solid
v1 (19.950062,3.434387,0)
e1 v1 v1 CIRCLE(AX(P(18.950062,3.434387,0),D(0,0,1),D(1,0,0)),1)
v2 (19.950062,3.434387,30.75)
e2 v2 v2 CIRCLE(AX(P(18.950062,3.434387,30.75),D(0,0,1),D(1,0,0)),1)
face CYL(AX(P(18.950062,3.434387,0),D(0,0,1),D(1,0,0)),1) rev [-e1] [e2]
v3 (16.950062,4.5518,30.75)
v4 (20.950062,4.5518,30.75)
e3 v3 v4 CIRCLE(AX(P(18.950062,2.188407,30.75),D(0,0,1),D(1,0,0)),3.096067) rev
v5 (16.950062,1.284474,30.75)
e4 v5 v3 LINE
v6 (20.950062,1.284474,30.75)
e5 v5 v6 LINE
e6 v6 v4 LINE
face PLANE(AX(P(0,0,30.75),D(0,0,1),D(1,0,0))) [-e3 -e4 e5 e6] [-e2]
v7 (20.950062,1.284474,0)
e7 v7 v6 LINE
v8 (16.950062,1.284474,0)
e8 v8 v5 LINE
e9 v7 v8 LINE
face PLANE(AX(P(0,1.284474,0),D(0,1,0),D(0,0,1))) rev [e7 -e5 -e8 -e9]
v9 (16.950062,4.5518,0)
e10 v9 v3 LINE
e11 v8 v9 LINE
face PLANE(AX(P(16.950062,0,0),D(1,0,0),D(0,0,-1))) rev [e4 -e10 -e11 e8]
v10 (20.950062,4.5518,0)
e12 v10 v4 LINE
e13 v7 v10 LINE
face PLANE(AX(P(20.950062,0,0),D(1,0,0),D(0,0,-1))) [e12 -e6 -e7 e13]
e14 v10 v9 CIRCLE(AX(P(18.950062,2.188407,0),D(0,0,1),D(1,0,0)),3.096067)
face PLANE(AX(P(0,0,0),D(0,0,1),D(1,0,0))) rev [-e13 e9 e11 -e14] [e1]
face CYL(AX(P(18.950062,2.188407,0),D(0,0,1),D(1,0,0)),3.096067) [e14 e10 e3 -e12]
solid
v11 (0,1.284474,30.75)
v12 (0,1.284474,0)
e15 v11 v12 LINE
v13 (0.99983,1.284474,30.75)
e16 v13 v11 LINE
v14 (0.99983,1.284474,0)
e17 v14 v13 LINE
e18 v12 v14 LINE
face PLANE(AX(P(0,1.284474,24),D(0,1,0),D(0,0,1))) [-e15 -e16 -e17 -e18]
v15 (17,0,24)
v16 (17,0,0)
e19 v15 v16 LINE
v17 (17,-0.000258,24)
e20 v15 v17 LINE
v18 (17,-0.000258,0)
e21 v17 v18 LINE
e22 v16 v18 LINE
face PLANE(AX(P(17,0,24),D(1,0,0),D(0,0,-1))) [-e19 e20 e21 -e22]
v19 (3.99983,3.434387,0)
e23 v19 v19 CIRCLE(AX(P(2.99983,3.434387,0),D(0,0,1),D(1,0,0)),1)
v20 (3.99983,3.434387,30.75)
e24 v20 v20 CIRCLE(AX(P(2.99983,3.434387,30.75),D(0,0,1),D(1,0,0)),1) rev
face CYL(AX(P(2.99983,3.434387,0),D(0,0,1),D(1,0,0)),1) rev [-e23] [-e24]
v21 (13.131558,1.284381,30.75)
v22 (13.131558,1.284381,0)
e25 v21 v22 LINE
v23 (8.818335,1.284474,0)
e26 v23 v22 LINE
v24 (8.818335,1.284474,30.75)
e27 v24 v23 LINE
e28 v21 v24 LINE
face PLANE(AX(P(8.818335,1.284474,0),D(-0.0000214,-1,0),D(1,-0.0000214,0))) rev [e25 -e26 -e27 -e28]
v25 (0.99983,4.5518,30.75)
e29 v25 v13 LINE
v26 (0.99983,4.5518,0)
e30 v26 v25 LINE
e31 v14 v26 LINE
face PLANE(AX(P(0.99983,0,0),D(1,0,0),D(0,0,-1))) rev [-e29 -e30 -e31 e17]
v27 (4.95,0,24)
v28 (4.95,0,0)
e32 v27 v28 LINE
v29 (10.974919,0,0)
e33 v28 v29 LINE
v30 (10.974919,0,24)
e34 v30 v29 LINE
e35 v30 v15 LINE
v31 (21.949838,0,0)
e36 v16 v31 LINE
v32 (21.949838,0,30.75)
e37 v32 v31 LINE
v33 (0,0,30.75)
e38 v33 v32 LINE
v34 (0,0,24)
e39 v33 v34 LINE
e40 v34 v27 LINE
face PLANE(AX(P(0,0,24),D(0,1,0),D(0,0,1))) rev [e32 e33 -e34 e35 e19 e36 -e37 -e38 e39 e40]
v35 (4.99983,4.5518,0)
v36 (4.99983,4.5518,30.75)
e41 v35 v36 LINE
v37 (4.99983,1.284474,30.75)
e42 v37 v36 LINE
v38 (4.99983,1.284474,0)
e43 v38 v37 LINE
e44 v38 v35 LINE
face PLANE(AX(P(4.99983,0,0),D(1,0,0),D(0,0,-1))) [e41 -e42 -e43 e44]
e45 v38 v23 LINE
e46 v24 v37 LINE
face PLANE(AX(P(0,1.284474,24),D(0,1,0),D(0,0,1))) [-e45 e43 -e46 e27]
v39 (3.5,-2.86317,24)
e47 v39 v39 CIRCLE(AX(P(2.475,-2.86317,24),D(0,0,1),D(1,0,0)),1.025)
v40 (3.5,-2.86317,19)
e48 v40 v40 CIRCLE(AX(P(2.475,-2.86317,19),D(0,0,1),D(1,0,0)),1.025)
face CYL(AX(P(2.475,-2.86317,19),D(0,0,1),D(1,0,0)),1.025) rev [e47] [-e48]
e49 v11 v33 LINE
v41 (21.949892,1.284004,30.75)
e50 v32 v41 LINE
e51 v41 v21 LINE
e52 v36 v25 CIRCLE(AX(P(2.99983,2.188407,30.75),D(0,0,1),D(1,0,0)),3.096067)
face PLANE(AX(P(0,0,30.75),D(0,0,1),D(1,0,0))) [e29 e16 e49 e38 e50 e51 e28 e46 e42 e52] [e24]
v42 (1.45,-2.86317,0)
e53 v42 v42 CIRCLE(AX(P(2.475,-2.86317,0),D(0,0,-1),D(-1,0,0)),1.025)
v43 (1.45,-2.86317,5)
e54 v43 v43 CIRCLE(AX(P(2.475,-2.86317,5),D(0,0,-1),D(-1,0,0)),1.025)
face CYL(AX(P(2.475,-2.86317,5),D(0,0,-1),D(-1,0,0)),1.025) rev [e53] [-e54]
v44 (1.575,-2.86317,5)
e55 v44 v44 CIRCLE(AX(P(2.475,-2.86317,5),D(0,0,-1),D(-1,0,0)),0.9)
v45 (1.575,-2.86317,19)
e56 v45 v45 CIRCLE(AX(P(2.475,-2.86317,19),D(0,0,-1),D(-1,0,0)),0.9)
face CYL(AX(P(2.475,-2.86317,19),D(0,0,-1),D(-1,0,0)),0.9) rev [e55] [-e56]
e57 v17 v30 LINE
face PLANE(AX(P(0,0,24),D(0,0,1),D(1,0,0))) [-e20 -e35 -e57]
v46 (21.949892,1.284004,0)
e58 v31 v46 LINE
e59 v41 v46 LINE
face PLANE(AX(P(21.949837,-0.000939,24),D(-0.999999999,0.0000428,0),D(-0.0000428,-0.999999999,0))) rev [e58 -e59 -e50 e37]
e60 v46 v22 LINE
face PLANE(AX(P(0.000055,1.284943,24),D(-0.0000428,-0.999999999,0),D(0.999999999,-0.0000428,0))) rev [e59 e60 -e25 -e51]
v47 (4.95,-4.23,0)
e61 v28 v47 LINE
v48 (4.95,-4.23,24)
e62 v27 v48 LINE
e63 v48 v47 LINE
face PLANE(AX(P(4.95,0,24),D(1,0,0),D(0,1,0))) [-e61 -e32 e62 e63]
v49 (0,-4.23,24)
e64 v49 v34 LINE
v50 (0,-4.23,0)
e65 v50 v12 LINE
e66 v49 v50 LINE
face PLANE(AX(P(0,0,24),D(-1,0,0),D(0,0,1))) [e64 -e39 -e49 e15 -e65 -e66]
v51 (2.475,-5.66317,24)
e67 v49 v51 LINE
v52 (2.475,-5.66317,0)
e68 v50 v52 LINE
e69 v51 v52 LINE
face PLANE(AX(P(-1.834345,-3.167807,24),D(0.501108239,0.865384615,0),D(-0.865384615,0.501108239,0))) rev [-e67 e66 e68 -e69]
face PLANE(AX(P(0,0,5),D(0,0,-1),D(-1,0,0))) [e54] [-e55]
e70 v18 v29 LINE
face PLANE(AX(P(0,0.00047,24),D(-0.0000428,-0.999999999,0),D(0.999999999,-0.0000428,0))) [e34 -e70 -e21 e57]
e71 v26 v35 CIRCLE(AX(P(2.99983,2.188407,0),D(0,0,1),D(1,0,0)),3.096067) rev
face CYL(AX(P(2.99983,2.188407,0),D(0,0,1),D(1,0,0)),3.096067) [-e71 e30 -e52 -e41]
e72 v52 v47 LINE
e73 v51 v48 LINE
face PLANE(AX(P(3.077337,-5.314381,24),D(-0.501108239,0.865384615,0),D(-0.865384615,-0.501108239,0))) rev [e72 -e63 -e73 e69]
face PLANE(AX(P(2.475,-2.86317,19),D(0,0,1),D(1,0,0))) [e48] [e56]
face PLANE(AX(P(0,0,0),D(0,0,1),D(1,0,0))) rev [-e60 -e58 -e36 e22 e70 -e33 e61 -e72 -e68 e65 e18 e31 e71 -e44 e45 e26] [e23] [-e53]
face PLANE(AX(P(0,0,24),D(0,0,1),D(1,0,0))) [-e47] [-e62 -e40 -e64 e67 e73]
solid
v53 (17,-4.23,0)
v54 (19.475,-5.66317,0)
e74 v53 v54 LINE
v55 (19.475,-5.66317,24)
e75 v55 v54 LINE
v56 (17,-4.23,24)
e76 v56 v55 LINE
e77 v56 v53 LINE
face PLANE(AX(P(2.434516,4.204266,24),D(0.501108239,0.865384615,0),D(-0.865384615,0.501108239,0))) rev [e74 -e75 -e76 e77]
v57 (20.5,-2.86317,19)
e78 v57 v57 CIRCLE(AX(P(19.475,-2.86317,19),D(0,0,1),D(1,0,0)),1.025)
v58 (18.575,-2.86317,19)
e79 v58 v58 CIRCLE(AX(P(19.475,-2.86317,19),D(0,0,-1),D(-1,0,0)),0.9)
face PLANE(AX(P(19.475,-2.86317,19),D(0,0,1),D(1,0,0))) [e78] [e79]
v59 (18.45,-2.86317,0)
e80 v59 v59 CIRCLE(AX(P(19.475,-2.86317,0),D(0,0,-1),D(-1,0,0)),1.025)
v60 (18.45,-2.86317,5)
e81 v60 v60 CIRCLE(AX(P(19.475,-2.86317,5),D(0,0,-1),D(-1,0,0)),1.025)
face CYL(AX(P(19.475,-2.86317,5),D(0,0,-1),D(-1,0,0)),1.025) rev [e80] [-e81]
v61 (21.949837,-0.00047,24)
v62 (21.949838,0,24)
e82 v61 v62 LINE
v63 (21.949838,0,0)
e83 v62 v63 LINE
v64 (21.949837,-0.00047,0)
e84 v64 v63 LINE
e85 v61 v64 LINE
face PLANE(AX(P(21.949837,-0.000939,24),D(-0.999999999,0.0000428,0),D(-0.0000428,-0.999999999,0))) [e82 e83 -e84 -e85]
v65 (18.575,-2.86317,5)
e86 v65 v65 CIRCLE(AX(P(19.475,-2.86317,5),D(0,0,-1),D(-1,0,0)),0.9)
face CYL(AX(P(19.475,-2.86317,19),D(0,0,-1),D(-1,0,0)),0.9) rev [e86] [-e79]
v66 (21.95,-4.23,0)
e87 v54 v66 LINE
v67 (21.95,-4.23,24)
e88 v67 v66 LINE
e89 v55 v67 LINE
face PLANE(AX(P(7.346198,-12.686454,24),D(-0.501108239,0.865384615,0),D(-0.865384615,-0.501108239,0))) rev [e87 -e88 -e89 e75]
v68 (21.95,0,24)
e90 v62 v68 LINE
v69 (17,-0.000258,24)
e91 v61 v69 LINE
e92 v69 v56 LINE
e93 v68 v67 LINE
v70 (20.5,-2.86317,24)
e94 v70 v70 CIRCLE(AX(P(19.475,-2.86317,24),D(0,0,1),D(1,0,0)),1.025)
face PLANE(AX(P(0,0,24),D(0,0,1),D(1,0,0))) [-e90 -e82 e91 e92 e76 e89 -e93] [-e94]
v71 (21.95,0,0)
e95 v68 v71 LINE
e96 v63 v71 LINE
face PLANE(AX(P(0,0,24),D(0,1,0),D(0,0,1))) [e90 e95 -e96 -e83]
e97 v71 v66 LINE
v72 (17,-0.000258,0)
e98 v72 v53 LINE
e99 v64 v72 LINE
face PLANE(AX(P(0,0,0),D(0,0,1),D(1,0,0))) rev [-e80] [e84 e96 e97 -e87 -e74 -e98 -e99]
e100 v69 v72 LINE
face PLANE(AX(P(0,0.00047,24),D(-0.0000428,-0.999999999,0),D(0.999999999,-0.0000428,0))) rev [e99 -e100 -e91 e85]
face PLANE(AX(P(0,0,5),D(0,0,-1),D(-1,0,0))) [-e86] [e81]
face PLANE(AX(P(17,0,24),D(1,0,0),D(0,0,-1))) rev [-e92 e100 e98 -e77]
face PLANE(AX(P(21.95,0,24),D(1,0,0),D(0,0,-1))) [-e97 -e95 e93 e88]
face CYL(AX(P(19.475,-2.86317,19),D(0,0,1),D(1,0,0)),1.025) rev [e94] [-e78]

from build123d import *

# Parameters (mm, degrees)
BOSS_EXTRUDE2_DEPTH     = 24
BOSS_EXTRUDE2_2_DEPTH   = 24
SKETCH6_R               = 1.025
CUT_EXTRUDE1_DEPTH      = 5
CUT_EXTRUDE2_START      = -5
SKETCH7_R               = 1.025
CUT_EXTRUDE2_DEPTH      = 5
SKETCH8_R               = 0.9
CUT_EXTRUDE3_DEPTH      = 14
CUT_EXTRUDE4_DEPTH      = 24
BOSS_EXTRUDE3_DEPTH     = 24
SKETCH13_R              = 1
CUT_EXTRUDE5_DEPTH      = 24
BOSS_EXTRUDE5_OUTLINE_R = 1
BOSS_EXTRUDE5_DEPTH     = 6.75


# Read off the part's stored shape, not the designer's step: Boss-Extrude5
with BuildPart() as part:
    # Sketch3 → Boss-Extrude2 (new body)
    with BuildSketch(Plane.XY):
        with BuildLine():
            Line((0, 1.284473501), (0, -4.23))
            Line((0, -4.23), (2.475, -5.663169564))
            Line((2.475, -5.663169564), (4.95, -4.23))
            Line((4.95, -4.23), (4.95, 0))
            Line((4.95, 0), (10.974918748, 0))
            Line((10.974918748, 0), (17, -0.000257875))
            Line((17, -0.000257875), (17, 0))
            Line((17, 0), (21.949837505, 0))
            Line((21.949837505, 0), (21.949892461, 1.28400377))
            Line((21.949892461, 1.28400377), (13.928131848, 1.284347104))
            Line((13.928131848, 1.284347104), (13.13155756, 1.284381197))
            Line((13.13155756, 1.284381197), (12.329651428, 1.886055123))
            ThreePointArc((12.329651428, 1.886055123), (12.474649771, 2.499007586), (12.355214929, 3.117449627))
            ThreePointArc((12.355214929, 3.117449627), (10.359172253, 3.897908673), (9.620266793, 1.886113105))
            Line((9.620266793, 1.886113105), (8.81833491, 1.284473501))
            Line((8.81833491, 1.284473501), (0, 1.284473501))
        make_face()
    extrude(amount=BOSS_EXTRUDE2_DEPTH)


with BuildPart() as body_2:
    # Sketch3 → Boss-Extrude2 2 (new body)
    with BuildSketch(Plane.XY):
        Polygon((21.949837485, -0.00046973), (17, -0.000257875), (17, -4.23), (19.475, -5.663169564), (21.95, -4.23), (21.95, 0), (21.949837505, 0), align=None)
    extrude(amount=BOSS_EXTRUDE2_2_DEPTH)


with BuildPart() as cut_extrude1_tool:
    # Sketch6 → Cut-Extrude1 (new body)
    with BuildSketch(Plane.XY.offset(24)):
        with Locations((2.475, -2.863169564)):
            Circle(SKETCH6_R)
        with Locations((19.475, -2.863169564)):
            Circle(SKETCH6_R)
    extrude(amount=-CUT_EXTRUDE1_DEPTH)


with BuildPart() as part_1:
    add(part.part)

    # Cut-Extrude1: cut by cut_extrude1_tool
    add(cut_extrude1_tool.part, mode=Mode.SUBTRACT)


with BuildPart() as body_2_1:
    add(body_2.part)

    # Cut-Extrude1: cut by cut_extrude1_tool
    add(cut_extrude1_tool.part, mode=Mode.SUBTRACT)


with BuildPart() as cut_extrude2_tool:
    # Sketch7 → Cut-Extrude2 (new body)
    with BuildSketch(Plane(origin=(0, 0, 0), x_dir=(-1, 0, 0), z_dir=(0, 0, -1)).offset(CUT_EXTRUDE2_START)):
        with Locations(Location((-19.475, -2.863169564, 0), (0, 0, 180))):
            Circle(SKETCH7_R)
        with Locations(Location((-2.475, -2.863169564, 0), (0, 0, 180))):
            Circle(SKETCH7_R)
    extrude(amount=CUT_EXTRUDE2_DEPTH)


with BuildPart() as part_2:
    add(part_1.part)

    # Cut-Extrude2: cut by cut_extrude2_tool
    add(cut_extrude2_tool.part, mode=Mode.SUBTRACT)


with BuildPart() as body_2_2:
    add(body_2_1.part)

    # Cut-Extrude2: cut by cut_extrude2_tool
    add(cut_extrude2_tool.part, mode=Mode.SUBTRACT)


with BuildPart() as cut_extrude3_tool:
    # Sketch8 → Cut-Extrude3 (new body)
    with BuildSketch(Plane(origin=(0, 0, 5), x_dir=(-1, 0, 0), z_dir=(0, 0, -1))):
        with Locations((-19.475, -2.863169564)):
            Circle(SKETCH8_R)
        with Locations((-2.475, -2.863169564)):
            Circle(SKETCH8_R)
    extrude(amount=-CUT_EXTRUDE3_DEPTH)


with BuildPart() as part_3:
    add(part_2.part)

    # Cut-Extrude3: cut by cut_extrude3_tool
    add(cut_extrude3_tool.part, mode=Mode.SUBTRACT)

    # Sketch9 → Cut-Extrude4 (cut)
    with BuildSketch(Plane.XY.offset(24)):
        Polygon((8.81833491, 1.284473501), (13.13155756, 1.284381197), (13.13155756, 4.431882999), (8.81833491, 4.431882999), align=None)
    extrude(amount=-CUT_EXTRUDE4_DEPTH, mode=Mode.SUBTRACT)

    # Sketch10 → Boss-Extrude3 (add)
    with BuildSketch(Plane.XY.offset(24)):
        with BuildLine():
            Line((0.99983047, 1.284473501), (4.99983047, 1.284473501))
            Line((4.99983047, 1.284473501), (4.99983047, 4.551800372))
            ThreePointArc((4.99983047, 4.551800372), (2.99983047, 5.284473501), (0.99983047, 4.551800372))
            Line((0.99983047, 4.551800372), (0.99983047, 1.284473501))
        make_face()
        with BuildLine():
            Line((20.950061999, 1.284473501), (16.950061999, 1.284473501))
            Line((16.950061999, 1.284473501), (16.950061999, 4.551800372))
            ThreePointArc((16.950061999, 4.551800372), (18.950061999, 5.284473501), (20.950061999, 4.551800372))
            Line((20.950061999, 4.551800372), (20.950061999, 1.284473501))
        make_face()
    extrude(amount=-BOSS_EXTRUDE3_DEPTH)


with BuildPart() as body_2_3:
    add(body_2_2.part)

    # Cut-Extrude3: cut by cut_extrude3_tool
    add(cut_extrude3_tool.part, mode=Mode.SUBTRACT)


with BuildPart() as boss_extrude3_piece_1:
    # of the separate pieces the step leaves, piece 1, a body of its own (boss_extrude3_pieces)
    add(part_3.part.solids().sort_by_distance((8.81833491, 1.284473501, 0))[0])


with BuildPart() as boss_extrude3_piece_2:
    # of the separate pieces the step leaves, piece 2, a body of its own (boss_extrude3_pieces)
    add(part_3.part.solids().sort_by_distance((20.950061999, 1.284473501, 24))[0])


with BuildPart() as cut_extrude5_tool:
    # Sketch13 → Cut-Extrude5 (new body)
    with BuildSketch(Plane.XY.offset(24)):
        with Locations((2.99983047, 3.434387417)):
            Circle(SKETCH13_R)
        with Locations((18.950061999, 3.434387417)):
            Circle(SKETCH13_R)
    extrude(amount=-CUT_EXTRUDE5_DEPTH)


with BuildPart() as boss_extrude3_piece_1_1:
    add(boss_extrude3_piece_1.part)

    # Cut-Extrude5: cut by cut_extrude5_tool
    add(cut_extrude5_tool.part, mode=Mode.SUBTRACT)


with BuildPart() as boss_extrude3_piece_2_1:
    add(boss_extrude3_piece_2.part)

    # Cut-Extrude5: cut by cut_extrude5_tool
    add(cut_extrude5_tool.part, mode=Mode.SUBTRACT)


    add(boss_extrude3_piece_1_1.part)  # Boss-Extrude5 merges Boss-Extrude3 piece 1
    # Boss-Extrude5 outline → Boss-Extrude5 (add)
    # profile 1 of 2: a face of its own
    with BuildSketch(Plane.XY.offset(24)):
        with BuildLine():
            Line((16.950061999, 1.284473501), (20.950061999, 1.284473501))
            Line((20.950061999, 1.284473501), (20.950061999, 4.551800372))
            ThreePointArc((20.950061999, 4.551800372), (18.950061999, 5.284473501), (16.950061999, 4.551800372))
            Line((16.950061999, 4.551800372), (16.950061999, 1.284473501))
        make_face()
        with Locations((18.950061999, 3.434387417)):
            Circle(BOSS_EXTRUDE5_OUTLINE_R, mode=Mode.SUBTRACT)
    # profile 2 of 2: a face of its own
    with BuildSketch(Plane.XY.offset(24)):
        with BuildLine():
            Line((13.13155756, 1.284381197), (8.81833491, 1.284473501))
            Line((8.81833491, 1.284473501), (4.99983047, 1.284473501))
            Line((4.99983047, 1.284473501), (4.99983047, 4.551800372))
            ThreePointArc((4.99983047, 4.551800372), (2.99983047, 5.284473501), (0.99983047, 4.551800372))
            Line((0.99983047, 4.551800372), (0.99983047, 1.284473501))
            Line((0.99983047, 1.284473501), (0, 1.284473501))
            Line((0, 1.284473501), (0, 0))
            Line((0, 0), (21.949837505, 0))
            Line((21.949837505, 0), (21.949892461, 1.28400377))
            Line((21.949892461, 1.28400377), (13.13155756, 1.284381197))
        make_face()
        with Locations((2.99983047, 3.434387417)):
            Circle(BOSS_EXTRUDE5_OUTLINE_R, mode=Mode.SUBTRACT)
    extrude(amount=BOSS_EXTRUDE5_DEPTH)


solid = Compound([body_2_3.part, boss_extrude3_piece_2_1.part])
